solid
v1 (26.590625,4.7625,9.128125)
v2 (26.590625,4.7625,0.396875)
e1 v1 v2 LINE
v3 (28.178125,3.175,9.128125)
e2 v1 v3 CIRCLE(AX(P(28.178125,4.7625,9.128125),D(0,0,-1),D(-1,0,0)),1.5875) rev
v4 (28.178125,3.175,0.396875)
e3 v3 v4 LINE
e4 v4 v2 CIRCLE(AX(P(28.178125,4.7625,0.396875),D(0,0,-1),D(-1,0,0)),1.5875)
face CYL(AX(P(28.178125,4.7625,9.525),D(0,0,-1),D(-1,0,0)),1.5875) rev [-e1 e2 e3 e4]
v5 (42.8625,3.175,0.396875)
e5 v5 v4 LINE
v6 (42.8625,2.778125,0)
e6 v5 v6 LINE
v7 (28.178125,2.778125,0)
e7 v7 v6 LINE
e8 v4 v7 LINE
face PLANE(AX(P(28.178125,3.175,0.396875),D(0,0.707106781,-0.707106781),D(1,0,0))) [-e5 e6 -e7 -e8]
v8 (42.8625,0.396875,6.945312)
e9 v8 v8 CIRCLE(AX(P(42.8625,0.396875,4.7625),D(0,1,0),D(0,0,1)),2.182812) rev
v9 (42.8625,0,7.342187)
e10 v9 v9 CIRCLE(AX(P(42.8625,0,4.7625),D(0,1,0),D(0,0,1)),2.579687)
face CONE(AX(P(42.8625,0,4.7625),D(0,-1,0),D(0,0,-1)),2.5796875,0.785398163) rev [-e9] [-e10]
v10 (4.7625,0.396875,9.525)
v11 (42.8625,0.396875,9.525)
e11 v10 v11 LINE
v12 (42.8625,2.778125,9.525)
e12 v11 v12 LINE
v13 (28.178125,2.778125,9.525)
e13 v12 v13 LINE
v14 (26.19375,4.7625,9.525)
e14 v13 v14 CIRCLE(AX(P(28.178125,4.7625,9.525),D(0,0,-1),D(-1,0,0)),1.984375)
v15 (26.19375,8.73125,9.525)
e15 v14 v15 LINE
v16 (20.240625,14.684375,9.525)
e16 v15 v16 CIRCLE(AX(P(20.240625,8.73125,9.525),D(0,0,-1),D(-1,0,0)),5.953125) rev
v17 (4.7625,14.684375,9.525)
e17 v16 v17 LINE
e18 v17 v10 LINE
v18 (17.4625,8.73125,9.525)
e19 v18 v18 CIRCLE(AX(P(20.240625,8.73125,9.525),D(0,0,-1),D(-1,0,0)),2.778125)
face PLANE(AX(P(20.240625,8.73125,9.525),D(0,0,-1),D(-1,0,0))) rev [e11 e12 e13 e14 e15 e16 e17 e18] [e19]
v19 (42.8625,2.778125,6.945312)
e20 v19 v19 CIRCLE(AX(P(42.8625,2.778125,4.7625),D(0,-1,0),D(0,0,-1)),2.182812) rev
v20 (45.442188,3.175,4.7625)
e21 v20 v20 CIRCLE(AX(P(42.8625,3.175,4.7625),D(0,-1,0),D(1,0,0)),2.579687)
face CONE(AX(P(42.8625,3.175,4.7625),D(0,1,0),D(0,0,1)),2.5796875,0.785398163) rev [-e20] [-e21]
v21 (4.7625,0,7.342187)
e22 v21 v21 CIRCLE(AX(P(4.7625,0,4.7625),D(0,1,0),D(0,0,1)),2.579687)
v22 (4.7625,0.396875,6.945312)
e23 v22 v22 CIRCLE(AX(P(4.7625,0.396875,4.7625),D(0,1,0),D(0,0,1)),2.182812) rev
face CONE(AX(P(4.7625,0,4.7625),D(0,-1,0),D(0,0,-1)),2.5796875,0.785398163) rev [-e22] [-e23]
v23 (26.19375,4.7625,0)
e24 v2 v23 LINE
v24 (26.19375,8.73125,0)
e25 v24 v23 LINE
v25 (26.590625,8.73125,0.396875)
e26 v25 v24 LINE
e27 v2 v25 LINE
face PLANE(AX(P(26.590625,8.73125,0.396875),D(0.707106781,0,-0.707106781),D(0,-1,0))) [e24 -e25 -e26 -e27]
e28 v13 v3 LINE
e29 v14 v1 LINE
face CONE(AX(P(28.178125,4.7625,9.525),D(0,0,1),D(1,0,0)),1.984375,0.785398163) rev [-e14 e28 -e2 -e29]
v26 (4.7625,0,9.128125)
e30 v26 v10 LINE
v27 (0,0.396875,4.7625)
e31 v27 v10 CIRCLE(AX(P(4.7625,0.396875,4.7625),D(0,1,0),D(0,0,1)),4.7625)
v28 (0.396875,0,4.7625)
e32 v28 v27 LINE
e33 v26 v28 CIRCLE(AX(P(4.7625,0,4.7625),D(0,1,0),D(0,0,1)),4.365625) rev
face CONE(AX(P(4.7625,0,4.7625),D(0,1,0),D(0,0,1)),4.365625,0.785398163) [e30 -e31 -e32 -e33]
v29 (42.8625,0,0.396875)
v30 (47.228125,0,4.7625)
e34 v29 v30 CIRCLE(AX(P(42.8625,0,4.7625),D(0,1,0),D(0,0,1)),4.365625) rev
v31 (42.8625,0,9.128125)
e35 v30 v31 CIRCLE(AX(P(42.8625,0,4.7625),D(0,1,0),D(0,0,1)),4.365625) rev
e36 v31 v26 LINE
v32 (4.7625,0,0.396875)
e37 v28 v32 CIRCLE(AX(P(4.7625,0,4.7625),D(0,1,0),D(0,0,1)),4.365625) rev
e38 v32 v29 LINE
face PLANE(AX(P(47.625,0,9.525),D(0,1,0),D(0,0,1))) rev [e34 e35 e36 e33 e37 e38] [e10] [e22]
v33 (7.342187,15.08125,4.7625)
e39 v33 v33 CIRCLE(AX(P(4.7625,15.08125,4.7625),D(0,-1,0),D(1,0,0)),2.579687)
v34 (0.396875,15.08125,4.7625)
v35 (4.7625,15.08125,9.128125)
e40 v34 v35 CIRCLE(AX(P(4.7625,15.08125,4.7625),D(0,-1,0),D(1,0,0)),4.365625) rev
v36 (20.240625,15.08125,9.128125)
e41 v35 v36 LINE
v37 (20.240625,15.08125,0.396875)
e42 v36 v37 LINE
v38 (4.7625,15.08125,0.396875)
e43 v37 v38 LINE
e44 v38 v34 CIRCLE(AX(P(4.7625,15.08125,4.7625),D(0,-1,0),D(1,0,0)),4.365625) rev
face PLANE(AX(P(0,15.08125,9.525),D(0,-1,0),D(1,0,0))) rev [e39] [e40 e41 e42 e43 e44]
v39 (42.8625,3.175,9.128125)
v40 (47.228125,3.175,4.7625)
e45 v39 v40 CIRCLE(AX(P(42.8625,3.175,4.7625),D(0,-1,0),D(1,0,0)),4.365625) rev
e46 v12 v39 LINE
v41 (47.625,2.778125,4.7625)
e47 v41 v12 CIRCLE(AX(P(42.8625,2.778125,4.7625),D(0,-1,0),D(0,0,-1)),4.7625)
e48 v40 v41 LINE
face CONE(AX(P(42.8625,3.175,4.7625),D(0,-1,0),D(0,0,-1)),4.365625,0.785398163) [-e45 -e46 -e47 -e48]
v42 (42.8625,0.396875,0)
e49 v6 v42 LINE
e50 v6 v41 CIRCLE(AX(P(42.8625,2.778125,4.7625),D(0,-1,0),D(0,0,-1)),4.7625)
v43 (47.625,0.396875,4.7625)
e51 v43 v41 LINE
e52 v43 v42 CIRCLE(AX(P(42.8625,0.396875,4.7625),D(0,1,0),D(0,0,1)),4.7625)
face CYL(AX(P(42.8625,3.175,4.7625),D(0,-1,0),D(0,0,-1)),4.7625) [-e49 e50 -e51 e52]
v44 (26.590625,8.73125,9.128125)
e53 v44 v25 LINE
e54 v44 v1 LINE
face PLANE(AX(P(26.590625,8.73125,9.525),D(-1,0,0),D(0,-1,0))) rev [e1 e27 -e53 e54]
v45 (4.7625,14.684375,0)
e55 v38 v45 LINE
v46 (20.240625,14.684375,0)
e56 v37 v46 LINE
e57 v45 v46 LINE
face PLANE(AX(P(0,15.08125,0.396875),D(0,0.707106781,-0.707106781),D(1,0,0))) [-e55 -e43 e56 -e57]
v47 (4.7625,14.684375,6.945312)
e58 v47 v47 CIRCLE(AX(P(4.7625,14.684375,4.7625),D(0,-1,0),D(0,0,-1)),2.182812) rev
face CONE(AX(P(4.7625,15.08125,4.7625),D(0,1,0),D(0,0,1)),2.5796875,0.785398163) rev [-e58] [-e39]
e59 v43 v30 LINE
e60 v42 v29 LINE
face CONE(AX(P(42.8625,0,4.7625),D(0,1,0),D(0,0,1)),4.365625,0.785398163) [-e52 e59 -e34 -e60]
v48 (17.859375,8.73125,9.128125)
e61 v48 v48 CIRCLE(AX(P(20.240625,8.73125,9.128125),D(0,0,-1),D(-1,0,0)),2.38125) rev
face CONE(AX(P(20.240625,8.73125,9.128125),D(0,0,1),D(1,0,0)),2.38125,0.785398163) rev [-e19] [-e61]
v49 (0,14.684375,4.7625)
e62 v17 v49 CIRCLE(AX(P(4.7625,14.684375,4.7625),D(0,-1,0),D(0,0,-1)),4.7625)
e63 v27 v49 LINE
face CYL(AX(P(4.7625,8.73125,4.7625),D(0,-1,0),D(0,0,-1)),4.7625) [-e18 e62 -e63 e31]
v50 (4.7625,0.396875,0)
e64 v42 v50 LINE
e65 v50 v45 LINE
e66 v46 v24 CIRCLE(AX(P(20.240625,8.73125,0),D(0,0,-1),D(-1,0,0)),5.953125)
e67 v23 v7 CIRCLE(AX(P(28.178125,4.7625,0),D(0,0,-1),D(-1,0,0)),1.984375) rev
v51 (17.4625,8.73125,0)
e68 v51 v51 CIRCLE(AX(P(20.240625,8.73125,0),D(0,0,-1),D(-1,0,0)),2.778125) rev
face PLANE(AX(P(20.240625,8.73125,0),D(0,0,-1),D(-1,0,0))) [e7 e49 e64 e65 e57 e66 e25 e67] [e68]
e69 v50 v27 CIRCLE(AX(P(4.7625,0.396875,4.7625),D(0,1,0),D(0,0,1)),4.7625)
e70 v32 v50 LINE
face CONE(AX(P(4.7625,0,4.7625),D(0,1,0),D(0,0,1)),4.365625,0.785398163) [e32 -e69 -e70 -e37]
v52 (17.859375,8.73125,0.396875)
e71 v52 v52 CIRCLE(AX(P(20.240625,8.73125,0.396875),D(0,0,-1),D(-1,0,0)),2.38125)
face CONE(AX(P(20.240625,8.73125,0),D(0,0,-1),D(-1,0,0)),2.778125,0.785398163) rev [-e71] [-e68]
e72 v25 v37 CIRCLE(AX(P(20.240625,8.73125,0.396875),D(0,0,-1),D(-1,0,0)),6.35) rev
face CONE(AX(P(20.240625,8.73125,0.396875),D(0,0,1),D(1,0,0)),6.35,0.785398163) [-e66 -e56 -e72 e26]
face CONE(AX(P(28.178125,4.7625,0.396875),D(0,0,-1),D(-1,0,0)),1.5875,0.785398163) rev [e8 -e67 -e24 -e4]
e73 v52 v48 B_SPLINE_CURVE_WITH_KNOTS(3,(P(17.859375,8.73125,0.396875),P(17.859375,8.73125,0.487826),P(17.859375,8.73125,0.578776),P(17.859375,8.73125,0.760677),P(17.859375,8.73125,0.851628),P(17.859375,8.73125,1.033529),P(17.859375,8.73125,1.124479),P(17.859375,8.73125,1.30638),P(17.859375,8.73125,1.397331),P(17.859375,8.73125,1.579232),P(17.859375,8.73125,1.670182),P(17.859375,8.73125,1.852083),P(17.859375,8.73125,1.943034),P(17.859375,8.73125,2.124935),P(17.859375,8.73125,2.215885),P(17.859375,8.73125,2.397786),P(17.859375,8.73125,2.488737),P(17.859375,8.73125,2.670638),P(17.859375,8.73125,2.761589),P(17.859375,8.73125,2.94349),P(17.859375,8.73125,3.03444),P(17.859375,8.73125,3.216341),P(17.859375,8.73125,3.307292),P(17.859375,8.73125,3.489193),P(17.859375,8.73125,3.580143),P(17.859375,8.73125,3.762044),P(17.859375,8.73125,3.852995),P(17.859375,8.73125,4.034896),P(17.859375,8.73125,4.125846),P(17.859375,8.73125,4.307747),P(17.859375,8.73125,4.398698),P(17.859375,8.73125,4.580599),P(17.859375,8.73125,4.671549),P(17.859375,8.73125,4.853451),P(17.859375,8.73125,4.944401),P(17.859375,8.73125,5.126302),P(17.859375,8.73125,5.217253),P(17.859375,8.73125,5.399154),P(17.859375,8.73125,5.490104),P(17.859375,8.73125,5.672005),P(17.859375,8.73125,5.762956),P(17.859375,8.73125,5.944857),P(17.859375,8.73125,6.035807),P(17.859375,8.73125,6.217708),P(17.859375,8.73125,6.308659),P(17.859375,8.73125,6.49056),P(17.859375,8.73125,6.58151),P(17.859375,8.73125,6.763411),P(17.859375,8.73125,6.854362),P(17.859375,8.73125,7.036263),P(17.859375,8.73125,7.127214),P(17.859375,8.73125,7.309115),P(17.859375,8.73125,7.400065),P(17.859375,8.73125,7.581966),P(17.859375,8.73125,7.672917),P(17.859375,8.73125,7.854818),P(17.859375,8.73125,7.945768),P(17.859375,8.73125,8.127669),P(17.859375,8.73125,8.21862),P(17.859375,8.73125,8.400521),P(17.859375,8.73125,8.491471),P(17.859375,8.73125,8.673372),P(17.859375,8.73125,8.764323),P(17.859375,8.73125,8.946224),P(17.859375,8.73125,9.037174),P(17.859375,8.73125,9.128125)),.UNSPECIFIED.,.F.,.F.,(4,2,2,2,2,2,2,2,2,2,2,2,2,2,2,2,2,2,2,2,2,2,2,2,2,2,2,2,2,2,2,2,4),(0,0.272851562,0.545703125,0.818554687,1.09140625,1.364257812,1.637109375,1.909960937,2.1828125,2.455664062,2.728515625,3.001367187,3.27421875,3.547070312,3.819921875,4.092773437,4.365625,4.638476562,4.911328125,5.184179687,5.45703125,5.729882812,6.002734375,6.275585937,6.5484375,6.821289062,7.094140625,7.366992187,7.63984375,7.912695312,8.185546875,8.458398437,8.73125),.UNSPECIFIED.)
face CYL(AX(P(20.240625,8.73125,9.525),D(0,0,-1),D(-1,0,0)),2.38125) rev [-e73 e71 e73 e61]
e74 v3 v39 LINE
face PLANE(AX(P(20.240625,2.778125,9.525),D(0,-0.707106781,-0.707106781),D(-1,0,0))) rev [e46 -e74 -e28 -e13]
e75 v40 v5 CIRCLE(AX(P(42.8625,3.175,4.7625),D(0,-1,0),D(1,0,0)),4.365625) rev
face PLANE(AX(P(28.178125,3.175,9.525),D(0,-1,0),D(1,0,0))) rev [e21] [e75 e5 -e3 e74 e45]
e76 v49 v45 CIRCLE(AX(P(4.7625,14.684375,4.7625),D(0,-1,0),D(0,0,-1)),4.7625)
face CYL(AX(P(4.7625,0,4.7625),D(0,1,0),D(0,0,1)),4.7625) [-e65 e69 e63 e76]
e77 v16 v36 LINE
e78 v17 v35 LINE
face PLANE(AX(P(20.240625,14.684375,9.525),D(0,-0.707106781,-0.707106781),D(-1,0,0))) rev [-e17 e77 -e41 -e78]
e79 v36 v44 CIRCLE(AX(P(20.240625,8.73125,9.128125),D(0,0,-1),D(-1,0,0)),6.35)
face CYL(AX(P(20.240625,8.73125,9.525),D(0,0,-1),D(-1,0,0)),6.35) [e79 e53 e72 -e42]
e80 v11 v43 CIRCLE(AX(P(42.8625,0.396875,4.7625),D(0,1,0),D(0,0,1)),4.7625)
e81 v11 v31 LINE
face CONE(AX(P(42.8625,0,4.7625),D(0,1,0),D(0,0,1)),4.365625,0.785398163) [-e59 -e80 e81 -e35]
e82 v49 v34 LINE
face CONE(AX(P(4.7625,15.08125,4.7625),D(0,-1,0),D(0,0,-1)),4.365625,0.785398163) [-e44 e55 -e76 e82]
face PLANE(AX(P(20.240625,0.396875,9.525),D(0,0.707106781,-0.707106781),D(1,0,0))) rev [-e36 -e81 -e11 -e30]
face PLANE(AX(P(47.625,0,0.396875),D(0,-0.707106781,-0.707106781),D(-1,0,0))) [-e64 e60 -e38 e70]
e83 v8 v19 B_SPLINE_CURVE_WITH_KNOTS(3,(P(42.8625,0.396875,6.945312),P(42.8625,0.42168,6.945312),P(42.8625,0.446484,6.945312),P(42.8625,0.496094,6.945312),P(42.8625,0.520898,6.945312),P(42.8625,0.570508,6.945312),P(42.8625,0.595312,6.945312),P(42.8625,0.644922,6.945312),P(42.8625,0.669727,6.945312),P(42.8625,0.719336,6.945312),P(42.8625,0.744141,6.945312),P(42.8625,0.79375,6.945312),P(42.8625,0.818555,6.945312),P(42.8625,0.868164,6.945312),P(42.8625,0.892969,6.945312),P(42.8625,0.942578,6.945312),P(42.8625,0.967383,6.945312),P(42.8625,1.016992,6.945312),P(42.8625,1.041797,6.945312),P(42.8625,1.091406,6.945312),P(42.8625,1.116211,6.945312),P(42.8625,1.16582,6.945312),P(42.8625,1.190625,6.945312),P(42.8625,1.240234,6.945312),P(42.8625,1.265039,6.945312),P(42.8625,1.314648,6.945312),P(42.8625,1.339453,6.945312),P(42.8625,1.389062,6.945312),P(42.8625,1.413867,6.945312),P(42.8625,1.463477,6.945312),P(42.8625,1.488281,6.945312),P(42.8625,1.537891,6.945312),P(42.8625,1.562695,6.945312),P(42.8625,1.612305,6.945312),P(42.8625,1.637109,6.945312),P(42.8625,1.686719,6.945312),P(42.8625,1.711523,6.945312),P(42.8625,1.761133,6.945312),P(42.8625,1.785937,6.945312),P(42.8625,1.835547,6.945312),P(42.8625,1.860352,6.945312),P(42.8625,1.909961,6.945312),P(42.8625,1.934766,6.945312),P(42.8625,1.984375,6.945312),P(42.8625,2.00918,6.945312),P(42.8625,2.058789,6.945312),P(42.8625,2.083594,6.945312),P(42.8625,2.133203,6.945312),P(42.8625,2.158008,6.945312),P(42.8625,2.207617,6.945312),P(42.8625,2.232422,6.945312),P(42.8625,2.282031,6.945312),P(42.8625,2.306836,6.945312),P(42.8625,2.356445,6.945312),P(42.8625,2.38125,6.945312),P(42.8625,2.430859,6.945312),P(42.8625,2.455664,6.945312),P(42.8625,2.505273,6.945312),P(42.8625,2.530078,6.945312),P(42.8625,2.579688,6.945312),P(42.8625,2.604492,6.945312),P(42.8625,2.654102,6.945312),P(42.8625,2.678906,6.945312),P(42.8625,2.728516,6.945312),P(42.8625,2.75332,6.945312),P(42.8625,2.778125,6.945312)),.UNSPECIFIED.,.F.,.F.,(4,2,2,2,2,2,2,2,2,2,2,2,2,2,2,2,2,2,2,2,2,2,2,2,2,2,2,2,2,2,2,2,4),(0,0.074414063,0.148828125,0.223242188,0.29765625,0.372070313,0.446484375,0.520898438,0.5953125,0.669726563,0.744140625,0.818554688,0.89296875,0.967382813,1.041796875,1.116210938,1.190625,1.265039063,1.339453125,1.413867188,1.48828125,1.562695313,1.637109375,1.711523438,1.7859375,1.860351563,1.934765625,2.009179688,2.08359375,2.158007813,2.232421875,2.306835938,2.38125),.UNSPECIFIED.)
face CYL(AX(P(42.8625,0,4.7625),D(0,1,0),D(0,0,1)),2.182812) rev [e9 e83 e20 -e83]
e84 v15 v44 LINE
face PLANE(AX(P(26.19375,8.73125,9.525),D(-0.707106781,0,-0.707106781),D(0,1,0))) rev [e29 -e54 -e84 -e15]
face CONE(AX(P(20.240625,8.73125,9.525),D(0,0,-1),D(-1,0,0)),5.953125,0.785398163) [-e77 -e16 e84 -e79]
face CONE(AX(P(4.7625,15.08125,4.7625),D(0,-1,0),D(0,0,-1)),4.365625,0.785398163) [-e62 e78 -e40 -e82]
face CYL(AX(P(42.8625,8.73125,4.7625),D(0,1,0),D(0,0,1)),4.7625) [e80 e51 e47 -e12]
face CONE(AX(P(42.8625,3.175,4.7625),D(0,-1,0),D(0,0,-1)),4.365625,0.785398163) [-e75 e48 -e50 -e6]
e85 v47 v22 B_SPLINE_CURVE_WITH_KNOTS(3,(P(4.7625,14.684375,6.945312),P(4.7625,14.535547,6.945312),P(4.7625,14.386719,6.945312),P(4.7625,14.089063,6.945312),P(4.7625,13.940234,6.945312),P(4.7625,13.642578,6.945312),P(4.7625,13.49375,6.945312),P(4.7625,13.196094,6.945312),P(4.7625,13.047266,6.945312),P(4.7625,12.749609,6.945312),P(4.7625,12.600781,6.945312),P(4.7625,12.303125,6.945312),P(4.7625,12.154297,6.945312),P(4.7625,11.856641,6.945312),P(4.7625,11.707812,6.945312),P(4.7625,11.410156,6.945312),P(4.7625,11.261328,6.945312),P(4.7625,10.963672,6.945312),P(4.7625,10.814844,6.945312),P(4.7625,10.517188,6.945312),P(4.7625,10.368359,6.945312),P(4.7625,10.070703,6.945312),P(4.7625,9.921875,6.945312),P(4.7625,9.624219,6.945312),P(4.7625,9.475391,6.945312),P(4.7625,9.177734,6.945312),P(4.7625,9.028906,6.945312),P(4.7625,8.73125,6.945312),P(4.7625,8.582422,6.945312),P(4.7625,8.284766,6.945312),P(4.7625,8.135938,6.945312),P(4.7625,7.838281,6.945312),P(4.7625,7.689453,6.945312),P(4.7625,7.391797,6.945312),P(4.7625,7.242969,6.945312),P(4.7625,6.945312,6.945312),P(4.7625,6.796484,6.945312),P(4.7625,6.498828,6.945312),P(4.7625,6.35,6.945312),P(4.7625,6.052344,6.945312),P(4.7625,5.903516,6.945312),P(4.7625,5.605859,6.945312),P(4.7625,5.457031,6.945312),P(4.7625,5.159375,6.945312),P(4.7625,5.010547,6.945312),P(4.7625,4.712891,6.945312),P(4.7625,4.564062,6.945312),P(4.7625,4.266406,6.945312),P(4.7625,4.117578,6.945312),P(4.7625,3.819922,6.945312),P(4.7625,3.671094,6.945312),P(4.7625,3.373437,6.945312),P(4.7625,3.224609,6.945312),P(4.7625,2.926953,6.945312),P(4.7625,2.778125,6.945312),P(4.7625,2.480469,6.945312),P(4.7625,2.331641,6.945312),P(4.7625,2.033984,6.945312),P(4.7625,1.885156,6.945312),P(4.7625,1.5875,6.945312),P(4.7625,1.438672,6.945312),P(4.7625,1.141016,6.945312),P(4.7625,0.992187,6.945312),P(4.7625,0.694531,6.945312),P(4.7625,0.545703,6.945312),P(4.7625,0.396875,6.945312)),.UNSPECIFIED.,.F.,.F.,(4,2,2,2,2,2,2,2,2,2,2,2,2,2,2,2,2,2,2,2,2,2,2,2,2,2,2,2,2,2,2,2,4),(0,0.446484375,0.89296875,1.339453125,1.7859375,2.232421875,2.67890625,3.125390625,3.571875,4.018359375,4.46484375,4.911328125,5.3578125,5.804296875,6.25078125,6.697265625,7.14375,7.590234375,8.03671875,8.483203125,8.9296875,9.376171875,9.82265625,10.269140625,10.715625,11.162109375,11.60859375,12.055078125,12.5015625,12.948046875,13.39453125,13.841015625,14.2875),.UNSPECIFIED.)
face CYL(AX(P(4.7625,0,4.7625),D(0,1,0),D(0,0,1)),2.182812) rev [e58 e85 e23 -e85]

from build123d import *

# Parameters (mm, degrees)
SKETCH1_R               = 2.38125
BOSS_EXTRUDE1_DEPTH     = 9.525
CUT_EXTRUDE1_DEPTH      = 51.855779923
CUT_EXTRUDE1_DEPTH_BACK = 51.855779923
SKETCH2_R               = 2.1828125
FILLET1_R               = 4.7625
CHAMFER1_SIZE           = 0.396875


with BuildPart() as part:
    # Sketch1 → Boss-Extrude1 (new body)
    with BuildSketch(Plane.XY):
        with BuildLine():
            Line((0, 0), (0, 15.08125))
            Line((0, 15.08125), (20.240625, 15.08125))
            ThreePointArc((20.240625, 15.08125), (24.730753061, 13.221378061), (26.590625, 8.73125))
            Line((26.590625, 8.73125), (26.590625, 4.7625))
            ThreePointArc((26.590625, 4.7625), (27.055592985, 3.639967985), (28.178125, 3.175))
            Line((28.178125, 3.175), (47.625, 3.175))
            Line((47.625, 3.175), (47.625, 0))
            Line((47.625, 0), (0, 0))
        make_face()
        with Locations(Location((20.240625, 8.73125, 0), (0, 0, 180))):
            Circle(SKETCH1_R, mode=Mode.SUBTRACT)
    extrude(amount=BOSS_EXTRUDE1_DEPTH)

    # Sketch2 → Cut-Extrude1 (cut, two sides: drawn at the far end of the back side and taken through both)
    with BuildSketch(Plane(origin=(0, 15.08125, 0), x_dir=(1, 0, 0), z_dir=(0, 1, 0)).offset(-CUT_EXTRUDE1_DEPTH_BACK)):
        with Locations(Location((4.7625, -4.7625, 0), (0, 0, 270))):
            Circle(SKETCH2_R)
        with Locations(Location((42.8625, -4.7625, 0), (0, 0, 270))):
            Circle(SKETCH2_R)
    extrude(amount=CUT_EXTRUDE1_DEPTH + CUT_EXTRUDE1_DEPTH_BACK, mode=Mode.SUBTRACT)

    # Fillet1
    fillet1_edges = [part.edges().sort_by_distance(p)[0] for p in [
        (47.625, 1.5875, 9.525),
        (47.625, 1.5875, 0),
        (0, 7.540625, 0),
        (0, 7.540625, 9.525),
    ]]
    fillet(fillet1_edges, radius=FILLET1_R - 0.0001)  # a hair under: the kernel refuses the full size

    # Chamfer1
    chamfer1_edges = [part.edges().sort_by_distance(p)[0] for p in [
        (27.055592985, 3.639967985, 0),
        (27.055592985, 3.639967985, 9.525),
        (26.590625, 6.746875, 9.525),
        (22.621875, 8.73125, 0),
        (22.621875, 8.73125, 9.525),
        (24.730753061, 13.221378061, 9.525),
        (12.5015125, 15.08125, 9.525),
        (4.7625, 0, 2.5796875),
        (4.7625, 15.08125, 2.5796875),
        (42.8625, 0, 2.5796875),
        (42.8625, 3.175, 2.5796875),
        (23.8125, 0, 9.525),
        (35.5203625, 3.175, 9.525),
        (35.5203625, 3.175, 0),
        (46.230125335, 3.175, 1.394874665),
        (46.230125335, 3.175, 8.130125335),
        (23.8125, 0, 0),
        (1.394874665, 0, 8.130125335),
        (1.394874665, 0, 1.394874665),
        (46.230125335, 0, 1.394874665),
        (46.230125335, 0, 8.130125335),
        (1.394874665, 15.08125, 8.130125335),
        (1.394874665, 15.08125, 1.394874665),
        (12.5015125, 15.08125, 0),
        (24.730753061, 13.221378061, 0),
        (26.590625, 6.746875, 0),
    ]]
    chamfer(chamfer1_edges, length=CHAMFER1_SIZE)


solid = part.part
